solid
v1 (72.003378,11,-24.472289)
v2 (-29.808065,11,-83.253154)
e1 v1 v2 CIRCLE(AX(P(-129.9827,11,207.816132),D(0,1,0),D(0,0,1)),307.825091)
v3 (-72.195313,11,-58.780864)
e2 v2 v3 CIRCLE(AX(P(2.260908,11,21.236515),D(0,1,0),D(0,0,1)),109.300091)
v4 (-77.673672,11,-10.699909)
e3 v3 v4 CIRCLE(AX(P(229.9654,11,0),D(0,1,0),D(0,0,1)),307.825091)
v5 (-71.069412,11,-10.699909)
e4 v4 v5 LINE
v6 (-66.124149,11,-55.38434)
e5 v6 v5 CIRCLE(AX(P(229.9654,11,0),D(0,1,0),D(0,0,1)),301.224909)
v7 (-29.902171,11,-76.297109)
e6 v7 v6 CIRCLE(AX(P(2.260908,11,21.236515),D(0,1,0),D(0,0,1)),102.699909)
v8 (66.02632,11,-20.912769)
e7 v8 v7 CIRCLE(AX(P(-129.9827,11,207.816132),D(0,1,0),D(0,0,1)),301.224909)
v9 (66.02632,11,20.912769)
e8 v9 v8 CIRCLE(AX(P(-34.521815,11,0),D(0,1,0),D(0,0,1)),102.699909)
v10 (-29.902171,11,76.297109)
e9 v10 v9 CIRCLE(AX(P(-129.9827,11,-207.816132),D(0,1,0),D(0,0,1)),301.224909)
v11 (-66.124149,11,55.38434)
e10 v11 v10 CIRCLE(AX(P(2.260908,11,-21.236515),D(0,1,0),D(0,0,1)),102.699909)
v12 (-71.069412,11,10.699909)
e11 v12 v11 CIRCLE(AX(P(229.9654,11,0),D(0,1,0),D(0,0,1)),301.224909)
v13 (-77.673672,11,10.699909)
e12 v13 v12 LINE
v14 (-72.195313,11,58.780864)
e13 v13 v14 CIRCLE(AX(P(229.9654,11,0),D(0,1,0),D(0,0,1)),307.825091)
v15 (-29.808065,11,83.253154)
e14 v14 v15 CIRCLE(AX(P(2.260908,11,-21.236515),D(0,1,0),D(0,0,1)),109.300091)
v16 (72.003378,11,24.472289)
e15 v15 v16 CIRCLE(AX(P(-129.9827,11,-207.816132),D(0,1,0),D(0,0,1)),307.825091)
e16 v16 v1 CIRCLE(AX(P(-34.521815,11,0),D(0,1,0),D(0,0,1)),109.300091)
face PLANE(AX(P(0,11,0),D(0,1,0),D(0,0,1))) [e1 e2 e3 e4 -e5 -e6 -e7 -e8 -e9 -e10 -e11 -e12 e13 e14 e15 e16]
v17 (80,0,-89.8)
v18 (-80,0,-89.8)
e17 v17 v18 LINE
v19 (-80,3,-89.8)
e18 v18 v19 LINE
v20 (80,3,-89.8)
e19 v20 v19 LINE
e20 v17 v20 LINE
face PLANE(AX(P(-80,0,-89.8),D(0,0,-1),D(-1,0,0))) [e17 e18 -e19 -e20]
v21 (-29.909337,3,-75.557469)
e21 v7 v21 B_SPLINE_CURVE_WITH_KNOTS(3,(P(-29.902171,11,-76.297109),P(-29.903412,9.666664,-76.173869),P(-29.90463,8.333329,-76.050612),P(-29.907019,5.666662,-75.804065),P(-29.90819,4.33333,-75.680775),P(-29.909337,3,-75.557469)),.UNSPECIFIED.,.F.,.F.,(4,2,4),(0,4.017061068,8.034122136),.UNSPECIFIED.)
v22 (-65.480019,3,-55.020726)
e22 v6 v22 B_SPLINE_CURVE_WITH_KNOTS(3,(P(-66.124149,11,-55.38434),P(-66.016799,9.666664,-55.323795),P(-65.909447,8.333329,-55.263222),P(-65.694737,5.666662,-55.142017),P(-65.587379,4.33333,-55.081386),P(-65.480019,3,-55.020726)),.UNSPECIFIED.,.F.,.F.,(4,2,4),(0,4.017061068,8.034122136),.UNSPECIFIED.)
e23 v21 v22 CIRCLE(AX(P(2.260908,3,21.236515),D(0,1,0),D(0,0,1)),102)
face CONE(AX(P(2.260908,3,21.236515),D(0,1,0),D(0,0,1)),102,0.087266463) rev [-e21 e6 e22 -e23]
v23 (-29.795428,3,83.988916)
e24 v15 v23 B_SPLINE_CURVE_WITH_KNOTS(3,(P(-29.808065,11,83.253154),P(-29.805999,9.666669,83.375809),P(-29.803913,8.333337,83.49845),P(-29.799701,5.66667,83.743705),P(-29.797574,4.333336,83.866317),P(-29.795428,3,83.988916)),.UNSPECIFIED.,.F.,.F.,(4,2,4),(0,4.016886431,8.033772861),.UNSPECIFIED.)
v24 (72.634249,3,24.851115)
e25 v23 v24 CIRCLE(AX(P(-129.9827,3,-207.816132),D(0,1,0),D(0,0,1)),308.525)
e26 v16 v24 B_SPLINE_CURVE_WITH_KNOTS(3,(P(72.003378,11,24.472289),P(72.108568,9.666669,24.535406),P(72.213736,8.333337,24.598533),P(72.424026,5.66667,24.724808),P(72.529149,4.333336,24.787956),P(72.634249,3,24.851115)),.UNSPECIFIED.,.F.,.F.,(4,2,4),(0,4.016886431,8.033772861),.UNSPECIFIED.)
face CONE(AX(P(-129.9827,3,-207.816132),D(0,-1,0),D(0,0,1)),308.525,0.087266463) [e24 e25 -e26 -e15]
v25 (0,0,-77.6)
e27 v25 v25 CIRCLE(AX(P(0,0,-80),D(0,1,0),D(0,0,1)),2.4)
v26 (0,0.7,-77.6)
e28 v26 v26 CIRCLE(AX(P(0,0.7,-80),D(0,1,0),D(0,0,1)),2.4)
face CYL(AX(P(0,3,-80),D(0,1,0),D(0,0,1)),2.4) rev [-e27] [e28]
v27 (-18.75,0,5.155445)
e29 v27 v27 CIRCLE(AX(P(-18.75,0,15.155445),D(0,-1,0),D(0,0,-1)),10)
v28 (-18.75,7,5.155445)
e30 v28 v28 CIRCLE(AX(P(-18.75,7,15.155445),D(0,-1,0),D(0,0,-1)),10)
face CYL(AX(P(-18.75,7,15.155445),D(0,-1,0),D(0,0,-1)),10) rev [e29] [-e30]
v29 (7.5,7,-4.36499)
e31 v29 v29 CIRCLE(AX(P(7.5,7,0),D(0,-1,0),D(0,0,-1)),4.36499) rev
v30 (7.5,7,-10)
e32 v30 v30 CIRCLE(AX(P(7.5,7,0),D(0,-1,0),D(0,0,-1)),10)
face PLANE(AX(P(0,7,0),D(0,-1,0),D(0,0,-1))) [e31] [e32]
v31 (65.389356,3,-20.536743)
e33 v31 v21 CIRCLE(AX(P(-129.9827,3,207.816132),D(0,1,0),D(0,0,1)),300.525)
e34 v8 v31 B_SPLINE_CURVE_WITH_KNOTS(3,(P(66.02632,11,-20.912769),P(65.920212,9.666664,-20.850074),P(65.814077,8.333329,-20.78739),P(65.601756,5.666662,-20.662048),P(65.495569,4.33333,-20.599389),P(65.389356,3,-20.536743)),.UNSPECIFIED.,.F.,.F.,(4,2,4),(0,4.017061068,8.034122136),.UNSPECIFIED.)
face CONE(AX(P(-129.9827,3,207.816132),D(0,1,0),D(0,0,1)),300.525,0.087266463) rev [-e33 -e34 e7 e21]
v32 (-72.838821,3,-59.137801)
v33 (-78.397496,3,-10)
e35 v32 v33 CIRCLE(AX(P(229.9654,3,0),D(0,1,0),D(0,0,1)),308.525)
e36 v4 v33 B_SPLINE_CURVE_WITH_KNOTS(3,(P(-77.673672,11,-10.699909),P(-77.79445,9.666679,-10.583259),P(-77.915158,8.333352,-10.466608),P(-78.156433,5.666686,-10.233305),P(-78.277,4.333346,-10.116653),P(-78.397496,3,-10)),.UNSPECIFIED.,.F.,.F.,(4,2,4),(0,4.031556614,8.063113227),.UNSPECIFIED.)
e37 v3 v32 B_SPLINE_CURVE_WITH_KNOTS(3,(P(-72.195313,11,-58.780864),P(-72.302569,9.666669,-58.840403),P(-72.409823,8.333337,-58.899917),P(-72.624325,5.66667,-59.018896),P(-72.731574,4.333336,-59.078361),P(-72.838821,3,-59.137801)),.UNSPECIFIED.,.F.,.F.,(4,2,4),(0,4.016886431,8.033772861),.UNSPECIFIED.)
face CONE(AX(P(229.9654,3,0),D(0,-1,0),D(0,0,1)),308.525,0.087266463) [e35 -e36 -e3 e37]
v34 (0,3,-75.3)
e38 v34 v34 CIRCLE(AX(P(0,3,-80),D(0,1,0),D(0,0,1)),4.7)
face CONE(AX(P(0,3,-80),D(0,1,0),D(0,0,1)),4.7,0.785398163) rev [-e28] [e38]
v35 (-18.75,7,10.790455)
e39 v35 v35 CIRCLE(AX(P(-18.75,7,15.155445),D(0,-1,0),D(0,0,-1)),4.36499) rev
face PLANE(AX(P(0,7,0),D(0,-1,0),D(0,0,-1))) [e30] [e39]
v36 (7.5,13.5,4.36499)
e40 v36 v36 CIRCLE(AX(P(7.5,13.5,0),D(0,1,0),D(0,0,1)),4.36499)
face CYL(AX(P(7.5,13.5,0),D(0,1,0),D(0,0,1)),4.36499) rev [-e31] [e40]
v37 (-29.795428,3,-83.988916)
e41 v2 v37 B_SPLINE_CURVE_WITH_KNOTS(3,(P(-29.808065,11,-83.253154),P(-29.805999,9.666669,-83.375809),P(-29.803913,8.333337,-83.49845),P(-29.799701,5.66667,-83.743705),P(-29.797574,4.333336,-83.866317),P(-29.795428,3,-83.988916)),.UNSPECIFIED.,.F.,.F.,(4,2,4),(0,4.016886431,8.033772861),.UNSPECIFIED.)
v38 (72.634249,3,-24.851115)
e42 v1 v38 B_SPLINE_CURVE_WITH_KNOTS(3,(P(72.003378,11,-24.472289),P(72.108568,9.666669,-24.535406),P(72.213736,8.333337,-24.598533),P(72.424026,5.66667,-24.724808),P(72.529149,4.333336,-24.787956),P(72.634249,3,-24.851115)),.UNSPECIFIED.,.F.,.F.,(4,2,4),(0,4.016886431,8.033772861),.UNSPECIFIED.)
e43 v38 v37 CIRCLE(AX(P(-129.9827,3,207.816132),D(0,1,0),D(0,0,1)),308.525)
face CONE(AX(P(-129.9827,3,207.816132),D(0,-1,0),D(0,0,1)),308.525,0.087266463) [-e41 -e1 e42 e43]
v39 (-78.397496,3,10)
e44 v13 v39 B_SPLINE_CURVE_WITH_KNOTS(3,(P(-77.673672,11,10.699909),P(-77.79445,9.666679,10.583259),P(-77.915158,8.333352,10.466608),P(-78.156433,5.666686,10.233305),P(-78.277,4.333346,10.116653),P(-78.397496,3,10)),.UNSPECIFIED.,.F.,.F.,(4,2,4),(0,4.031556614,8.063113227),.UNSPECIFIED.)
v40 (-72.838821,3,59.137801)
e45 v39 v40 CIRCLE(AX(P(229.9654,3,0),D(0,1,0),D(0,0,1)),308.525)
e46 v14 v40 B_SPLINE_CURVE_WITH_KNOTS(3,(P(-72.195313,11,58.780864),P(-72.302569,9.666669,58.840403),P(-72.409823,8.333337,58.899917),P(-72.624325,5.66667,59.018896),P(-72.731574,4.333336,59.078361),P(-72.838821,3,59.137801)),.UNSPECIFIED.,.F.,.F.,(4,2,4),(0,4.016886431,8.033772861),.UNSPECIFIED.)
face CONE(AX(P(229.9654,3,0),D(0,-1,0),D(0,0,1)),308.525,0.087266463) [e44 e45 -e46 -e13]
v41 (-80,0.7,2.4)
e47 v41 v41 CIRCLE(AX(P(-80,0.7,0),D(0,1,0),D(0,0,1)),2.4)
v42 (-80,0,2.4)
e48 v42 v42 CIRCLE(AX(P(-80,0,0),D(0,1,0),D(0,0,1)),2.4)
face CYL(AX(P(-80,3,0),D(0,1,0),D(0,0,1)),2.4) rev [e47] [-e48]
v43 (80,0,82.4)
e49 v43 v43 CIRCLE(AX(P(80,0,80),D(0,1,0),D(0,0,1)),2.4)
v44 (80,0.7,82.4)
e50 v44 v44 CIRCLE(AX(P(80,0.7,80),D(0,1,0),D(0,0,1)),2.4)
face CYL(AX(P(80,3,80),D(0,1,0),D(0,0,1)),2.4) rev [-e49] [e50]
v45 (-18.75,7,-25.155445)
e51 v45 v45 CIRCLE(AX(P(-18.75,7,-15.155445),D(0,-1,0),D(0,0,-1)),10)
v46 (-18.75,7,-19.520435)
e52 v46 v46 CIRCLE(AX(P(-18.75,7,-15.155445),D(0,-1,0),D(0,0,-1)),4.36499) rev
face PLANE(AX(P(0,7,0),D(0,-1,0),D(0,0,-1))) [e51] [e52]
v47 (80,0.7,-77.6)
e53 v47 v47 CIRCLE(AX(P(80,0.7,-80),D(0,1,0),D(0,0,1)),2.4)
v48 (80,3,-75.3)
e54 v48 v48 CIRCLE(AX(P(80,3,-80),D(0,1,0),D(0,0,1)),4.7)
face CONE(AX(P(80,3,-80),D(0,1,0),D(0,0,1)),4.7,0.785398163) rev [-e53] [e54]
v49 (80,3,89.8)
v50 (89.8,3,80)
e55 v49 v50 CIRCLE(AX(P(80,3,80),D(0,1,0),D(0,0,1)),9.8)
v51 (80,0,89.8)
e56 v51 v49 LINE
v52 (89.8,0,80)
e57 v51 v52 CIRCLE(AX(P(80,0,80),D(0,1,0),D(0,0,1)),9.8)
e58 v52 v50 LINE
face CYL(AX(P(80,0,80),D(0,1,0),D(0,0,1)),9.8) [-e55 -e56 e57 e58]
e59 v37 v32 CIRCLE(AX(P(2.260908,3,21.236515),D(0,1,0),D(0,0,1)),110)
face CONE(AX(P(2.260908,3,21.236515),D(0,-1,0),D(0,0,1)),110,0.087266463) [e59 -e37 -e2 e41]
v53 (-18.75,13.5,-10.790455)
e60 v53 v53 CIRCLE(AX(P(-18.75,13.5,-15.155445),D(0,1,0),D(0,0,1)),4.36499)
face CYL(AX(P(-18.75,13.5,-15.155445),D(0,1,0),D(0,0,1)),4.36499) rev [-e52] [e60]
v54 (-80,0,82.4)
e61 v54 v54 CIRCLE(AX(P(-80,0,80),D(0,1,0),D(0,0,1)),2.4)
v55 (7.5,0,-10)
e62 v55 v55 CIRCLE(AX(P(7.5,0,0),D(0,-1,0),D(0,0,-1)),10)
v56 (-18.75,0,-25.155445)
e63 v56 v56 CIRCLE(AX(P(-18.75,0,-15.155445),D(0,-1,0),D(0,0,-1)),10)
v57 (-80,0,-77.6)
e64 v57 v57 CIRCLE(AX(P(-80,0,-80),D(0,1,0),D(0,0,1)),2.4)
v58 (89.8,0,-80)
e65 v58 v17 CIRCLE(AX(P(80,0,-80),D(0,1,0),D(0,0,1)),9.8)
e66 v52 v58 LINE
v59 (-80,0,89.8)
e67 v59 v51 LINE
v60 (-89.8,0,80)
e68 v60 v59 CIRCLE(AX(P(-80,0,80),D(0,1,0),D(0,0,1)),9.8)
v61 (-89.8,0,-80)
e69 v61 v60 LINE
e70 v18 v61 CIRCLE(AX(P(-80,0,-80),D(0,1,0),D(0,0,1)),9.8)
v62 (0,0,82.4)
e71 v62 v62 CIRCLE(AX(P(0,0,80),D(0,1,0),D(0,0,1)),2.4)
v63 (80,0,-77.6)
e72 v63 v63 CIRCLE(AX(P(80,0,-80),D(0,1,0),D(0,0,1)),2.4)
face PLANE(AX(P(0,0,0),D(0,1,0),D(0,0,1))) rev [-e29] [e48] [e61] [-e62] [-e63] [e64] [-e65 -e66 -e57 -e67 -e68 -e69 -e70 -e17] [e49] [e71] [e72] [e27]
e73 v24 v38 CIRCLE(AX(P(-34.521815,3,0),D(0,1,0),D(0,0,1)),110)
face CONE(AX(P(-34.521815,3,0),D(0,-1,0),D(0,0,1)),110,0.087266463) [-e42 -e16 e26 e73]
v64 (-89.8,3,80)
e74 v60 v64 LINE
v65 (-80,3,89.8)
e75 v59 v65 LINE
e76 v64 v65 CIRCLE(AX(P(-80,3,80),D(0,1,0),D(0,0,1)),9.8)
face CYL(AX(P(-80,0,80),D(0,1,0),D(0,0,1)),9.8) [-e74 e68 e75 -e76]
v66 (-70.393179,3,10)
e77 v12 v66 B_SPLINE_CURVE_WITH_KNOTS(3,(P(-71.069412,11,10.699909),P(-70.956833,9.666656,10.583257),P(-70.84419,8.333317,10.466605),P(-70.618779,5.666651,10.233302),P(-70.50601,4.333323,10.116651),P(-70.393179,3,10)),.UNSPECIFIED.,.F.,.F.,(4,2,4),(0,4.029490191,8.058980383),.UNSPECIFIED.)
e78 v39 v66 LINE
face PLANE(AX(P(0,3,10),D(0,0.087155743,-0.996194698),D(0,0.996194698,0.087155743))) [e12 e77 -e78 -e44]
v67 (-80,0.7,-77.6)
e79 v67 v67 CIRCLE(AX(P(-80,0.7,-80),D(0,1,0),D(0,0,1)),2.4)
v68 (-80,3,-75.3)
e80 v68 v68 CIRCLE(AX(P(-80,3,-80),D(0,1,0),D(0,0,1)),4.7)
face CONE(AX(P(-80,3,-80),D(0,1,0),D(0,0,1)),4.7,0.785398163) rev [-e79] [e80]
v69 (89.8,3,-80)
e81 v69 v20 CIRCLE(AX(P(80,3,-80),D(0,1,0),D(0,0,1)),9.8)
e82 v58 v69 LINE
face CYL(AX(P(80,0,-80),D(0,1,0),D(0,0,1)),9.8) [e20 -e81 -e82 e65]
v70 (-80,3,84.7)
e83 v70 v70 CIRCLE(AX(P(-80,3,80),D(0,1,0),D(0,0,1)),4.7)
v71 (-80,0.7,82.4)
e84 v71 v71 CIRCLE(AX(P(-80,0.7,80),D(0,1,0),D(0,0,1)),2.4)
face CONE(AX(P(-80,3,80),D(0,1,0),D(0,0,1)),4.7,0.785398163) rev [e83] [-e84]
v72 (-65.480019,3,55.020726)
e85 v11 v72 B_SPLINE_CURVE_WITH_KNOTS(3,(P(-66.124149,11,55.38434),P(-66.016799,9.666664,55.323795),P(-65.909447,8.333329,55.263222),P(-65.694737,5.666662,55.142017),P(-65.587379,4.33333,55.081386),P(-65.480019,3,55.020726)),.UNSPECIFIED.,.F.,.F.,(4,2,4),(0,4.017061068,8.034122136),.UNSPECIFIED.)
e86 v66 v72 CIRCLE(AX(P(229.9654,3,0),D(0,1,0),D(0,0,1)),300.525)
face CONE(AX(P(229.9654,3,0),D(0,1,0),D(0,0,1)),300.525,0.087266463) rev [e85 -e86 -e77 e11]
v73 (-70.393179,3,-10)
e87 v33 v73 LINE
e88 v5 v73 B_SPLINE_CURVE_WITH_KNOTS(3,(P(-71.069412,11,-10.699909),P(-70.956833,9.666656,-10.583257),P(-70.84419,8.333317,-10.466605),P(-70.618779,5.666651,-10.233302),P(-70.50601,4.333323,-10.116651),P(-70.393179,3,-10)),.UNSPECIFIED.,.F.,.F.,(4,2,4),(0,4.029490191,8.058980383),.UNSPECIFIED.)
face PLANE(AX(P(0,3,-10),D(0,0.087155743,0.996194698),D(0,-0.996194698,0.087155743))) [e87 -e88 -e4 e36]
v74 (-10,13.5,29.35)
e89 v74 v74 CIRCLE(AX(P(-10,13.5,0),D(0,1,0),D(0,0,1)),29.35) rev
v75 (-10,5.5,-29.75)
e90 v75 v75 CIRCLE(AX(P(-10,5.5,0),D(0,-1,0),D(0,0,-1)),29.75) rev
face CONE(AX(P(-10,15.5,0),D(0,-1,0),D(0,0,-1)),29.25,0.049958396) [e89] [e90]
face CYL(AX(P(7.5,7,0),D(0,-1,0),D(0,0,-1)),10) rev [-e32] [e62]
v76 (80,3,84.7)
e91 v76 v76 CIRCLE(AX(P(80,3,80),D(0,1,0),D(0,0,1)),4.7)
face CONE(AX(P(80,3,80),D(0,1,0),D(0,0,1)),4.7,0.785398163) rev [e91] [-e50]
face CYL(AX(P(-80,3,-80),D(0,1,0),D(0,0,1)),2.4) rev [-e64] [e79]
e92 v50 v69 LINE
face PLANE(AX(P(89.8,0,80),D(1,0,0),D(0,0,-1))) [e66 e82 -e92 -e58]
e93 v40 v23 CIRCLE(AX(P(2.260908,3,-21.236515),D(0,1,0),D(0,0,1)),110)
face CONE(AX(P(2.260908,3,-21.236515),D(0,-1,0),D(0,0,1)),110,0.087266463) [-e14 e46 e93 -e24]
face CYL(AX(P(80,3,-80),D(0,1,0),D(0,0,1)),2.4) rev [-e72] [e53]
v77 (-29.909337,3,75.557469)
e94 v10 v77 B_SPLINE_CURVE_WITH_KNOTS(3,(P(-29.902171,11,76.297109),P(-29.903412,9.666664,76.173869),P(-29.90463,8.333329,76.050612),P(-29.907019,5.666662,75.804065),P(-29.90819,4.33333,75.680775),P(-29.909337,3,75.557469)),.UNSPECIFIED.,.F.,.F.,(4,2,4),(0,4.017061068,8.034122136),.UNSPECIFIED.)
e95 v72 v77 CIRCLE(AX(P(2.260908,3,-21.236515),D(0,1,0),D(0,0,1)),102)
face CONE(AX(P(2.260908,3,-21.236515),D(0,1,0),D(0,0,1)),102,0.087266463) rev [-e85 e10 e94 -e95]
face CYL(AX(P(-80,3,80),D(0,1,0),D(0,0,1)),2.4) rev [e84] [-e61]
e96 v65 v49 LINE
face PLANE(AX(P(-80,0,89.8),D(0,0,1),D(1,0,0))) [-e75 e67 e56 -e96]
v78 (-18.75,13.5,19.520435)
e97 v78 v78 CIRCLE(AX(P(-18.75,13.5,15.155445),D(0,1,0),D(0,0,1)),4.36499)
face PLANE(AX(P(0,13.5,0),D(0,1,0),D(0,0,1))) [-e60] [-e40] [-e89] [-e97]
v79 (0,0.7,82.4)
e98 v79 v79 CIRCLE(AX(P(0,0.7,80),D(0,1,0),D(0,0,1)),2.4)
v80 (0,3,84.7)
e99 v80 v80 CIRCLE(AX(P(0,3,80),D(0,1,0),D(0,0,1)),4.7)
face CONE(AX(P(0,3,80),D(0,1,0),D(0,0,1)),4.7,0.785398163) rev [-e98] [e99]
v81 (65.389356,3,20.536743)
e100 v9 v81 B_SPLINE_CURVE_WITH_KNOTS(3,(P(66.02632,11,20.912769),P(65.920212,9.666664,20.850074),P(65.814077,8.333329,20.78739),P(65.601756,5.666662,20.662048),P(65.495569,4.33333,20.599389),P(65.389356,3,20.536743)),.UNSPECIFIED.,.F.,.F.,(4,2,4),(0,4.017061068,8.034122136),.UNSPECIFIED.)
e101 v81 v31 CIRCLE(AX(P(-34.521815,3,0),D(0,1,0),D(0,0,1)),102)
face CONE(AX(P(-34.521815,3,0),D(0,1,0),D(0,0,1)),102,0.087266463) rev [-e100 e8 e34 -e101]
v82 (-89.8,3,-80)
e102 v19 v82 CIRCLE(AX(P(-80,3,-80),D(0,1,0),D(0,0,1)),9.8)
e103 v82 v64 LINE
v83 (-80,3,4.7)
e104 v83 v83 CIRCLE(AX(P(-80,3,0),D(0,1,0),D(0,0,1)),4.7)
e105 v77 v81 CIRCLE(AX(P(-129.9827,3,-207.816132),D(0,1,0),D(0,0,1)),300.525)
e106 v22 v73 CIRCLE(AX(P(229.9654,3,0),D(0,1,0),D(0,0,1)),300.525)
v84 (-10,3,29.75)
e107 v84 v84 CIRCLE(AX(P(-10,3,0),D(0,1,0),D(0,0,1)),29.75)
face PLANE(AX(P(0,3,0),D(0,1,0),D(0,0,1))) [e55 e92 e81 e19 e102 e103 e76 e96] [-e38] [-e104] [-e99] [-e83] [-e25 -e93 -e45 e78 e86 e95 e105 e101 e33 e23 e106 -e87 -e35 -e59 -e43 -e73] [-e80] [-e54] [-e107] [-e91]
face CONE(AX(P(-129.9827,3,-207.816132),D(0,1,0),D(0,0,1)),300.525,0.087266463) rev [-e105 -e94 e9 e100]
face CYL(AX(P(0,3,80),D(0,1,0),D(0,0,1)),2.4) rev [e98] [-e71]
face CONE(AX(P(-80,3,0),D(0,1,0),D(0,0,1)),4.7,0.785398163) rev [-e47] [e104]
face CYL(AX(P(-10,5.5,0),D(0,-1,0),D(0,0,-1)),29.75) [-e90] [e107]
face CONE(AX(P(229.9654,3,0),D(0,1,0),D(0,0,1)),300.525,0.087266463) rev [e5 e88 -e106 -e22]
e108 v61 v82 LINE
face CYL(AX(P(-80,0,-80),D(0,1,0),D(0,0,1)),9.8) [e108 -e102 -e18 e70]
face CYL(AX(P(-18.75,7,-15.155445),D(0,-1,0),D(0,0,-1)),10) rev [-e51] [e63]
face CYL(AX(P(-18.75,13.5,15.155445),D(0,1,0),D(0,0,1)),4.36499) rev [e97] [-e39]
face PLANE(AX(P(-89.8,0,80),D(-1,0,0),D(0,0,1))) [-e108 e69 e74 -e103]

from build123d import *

# Parameters (mm, degrees)
SKETCH1_W                = 180
SKETCH1_H                = 180
SKETCH1_W_2              = 160
SKETCH1_H_2              = 160
SKETCH1_W_3              = 140
SKETCH1_H_3              = 140
BOSS_EXTRUDE1_DEPTH      = 3
SKETCH1_3_W              = 140
SKETCH1_3_H              = 140
BOSS_EXTRUDE2_DEPTH      = 5
SKETCH6_R                = 4.7
BOSS_EXTRUDE4_DEPTH      = 8
BOSS_EXTRUDE5_DEPTH      = 8
BOSS_EXTRUDE5_DRAFT      = 5
CUT_EXTRUDE1_START       = -5
SKETCH12_R               = 4.7
CUT_EXTRUDE1_DEPTH       = 5
SKETCH13_R               = 29.75
BOSS_EXTRUDE6_DEPTH      = 2.5
SKETCH14_R               = 29.75
SKETCH16_R               = 29.25
CUT_EXTRUDE2_START       = -2
CUT_EXTRUDE2_OUTLINE_R   = 34.25
CUT_EXTRUDE2_DEPTH       = 2
FILLET1_R                = 10
SKETCH19_W               = 140
SKETCH19_H               = 140
CUT_EXTRUDE3_DEPTH       = 5
F_5_16_CLEARANCE_HOLE1_D = 8.72998
SKETCH24_R               = 10
SKETCH24_R_2             = 4.36499
CUT_EXTRUDE4_DEPTH       = 7
CUT_EXTRUDE5_DEPTH       = 128.711589146


# Read off the part's stored shape, not the designer's step: CSK for M4 Flat Head Machine Screw1, Cut-Extrude2
with BuildPart() as part:
    # Sketch1 → Boss-Extrude1 (new body)
    # profile 1 of 3: a face of its own
    with BuildSketch(Plane(origin=(0, 0, 0), x_dir=(1, 0, 0), z_dir=(0, 1, 0))):
        Rectangle(SKETCH1_W, SKETCH1_H)
        Rectangle(SKETCH1_W_2, SKETCH1_H_2, mode=Mode.SUBTRACT)
    # profile 2 of 3: a face of its own
    with BuildSketch(Plane(origin=(0, 0, 0), x_dir=(1, 0, 0), z_dir=(0, 1, 0))):
        Rectangle(SKETCH1_W_2, SKETCH1_H_2)
        Rectangle(SKETCH1_W_3, SKETCH1_H_3, mode=Mode.SUBTRACT)
    # profile 3 of 3: a face of its own
    with BuildSketch(Plane(origin=(0, 0, 0), x_dir=(1, 0, 0), z_dir=(0, 1, 0))):
        Rectangle(SKETCH1_W_3, SKETCH1_H_3)
    extrude(amount=BOSS_EXTRUDE1_DEPTH)

    # Sketch1<3> → Boss-Extrude2 (add)
    with BuildSketch(Plane(origin=(0, 0, 0), x_dir=(1, 0, 0), z_dir=(0, 1, 0))):
        Rectangle(SKETCH1_3_W, SKETCH1_3_H)
    extrude(amount=-BOSS_EXTRUDE2_DEPTH)

    # CSK for M4 Flat Head Machine Screw1 outl → CSK for M4 Flat Head Machine Screw1 (revolve, cut)
    with BuildSketch(Plane(origin=(-80, 0, 0), x_dir=(1, 0, 0), z_dir=(0, 0, 1))):
        Polygon((0, 0), (2.4, 0), (2.4, 0.7), (4.7, 3), (0, 3), align=None)
    revolve(axis=Axis((-80, 0, 0), (0, 1, 0)), mode=Mode.SUBTRACT)

    # CSK for M4 Flat Head Machine Screw1 2 ou → CSK for M4 Flat Head Machine Screw1 2 (revolve, cut)
    with BuildSketch(Plane.XY.offset(80)):
        Polygon((0, 0), (2.4, 0), (2.4, 0.7), (4.7, 3), (0, 3), align=None)
    revolve(axis=Axis((0, 0, 80), (0, 1, 0)), mode=Mode.SUBTRACT)

    # CSK for M4 Flat Head Machine Screw1 3 ou → CSK for M4 Flat Head Machine Screw1 3 (revolve, cut)
    with BuildSketch(Plane(origin=(80, 0, 0), x_dir=(1, 0, 0), z_dir=(0, 0, 1))):
        Polygon((0, 0), (2.4, 0), (2.4, 0.7), (4.7, 3), (0, 3), align=None)
    revolve(axis=Axis((80, 0, 0), (0, 1, 0)), mode=Mode.SUBTRACT)

    # CSK for M4 Flat Head Machine Screw1 4 ou → CSK for M4 Flat Head Machine Screw1 4 (revolve, cut)
    with BuildSketch(Plane.XY.offset(-80)):
        Polygon((0, 0), (2.4, 0), (2.4, 0.7), (4.7, 3), (0, 3), align=None)
    revolve(axis=Axis((0, 0, -80), (0, 1, 0)), mode=Mode.SUBTRACT)

    # CSK for M4 Flat Head Machine Screw1 5 ou → CSK for M4 Flat Head Machine Screw1 5 (revolve, cut)
    with BuildSketch(Plane(origin=(-80, 0, 80), x_dir=(1, 0, 0), z_dir=(0, 0, 1))):
        Polygon((0, 0), (2.4, 0), (2.4, 0.7), (4.7, 3), (0, 3), align=None)
    revolve(axis=Axis((-80, 0, 80), (0, 1, 0)), mode=Mode.SUBTRACT)

    # CSK for M4 Flat Head Machine Screw1 6 ou → CSK for M4 Flat Head Machine Screw1 6 (revolve, cut)
    with BuildSketch(Plane(origin=(80, 0, -80), x_dir=(1, 0, 0), z_dir=(0, 0, 1))):
        Polygon((0, 0), (2.4, 0), (2.4, 0.7), (4.7, 3), (0, 3), align=None)
    revolve(axis=Axis((80, 0, -80), (0, 1, 0)), mode=Mode.SUBTRACT)

    # CSK for M4 Flat Head Machine Screw1 7 ou → CSK for M4 Flat Head Machine Screw1 7 (revolve, cut)
    with BuildSketch(Plane(origin=(80, 0, 80), x_dir=(1, 0, 0), z_dir=(0, 0, 1))):
        Polygon((0, 0), (2.4, 0), (2.4, 0.7), (4.7, 3), (0, 3), align=None)
    revolve(axis=Axis((80, 0, 80), (0, 1, 0)), mode=Mode.SUBTRACT)

    # CSK for M4 Flat Head Machine Screw1 8 ou → CSK for M4 Flat Head Machine Screw1 8 (revolve, cut)
    with BuildSketch(Plane(origin=(-80, 0, -80), x_dir=(1, 0, 0), z_dir=(0, 0, 1))):
        Polygon((0, 0), (2.4, 0), (2.4, 0.7), (4.7, 3), (0, 3), align=None)
    revolve(axis=Axis((-80, 0, -80), (0, 1, 0)), mode=Mode.SUBTRACT)

    # CSK for M4 Flat Head Machine Screw1 9 ou → CSK for M4 Flat Head Machine Screw1 9 (revolve, cut)
    with BuildSketch(Plane.XY):
        Polygon((0, -5), (2.4, -5), (2.4, 0.7), (4.7, 3), (0, 3), align=None)
    revolve(axis=Axis((0, 0, 0), (0, 1, 0)), mode=Mode.SUBTRACT)

    # Sketch6 → Boss-Extrude4 (add, through all)
    with BuildSketch(Plane(origin=(0, 3, 0), x_dir=(1, 0, 0), z_dir=(0, 1, 0))):
        with Locations(Location((80, 0, 0), (0, 0, 270))):
            Circle(SKETCH6_R)
        Circle(SKETCH6_R)
    extrude(amount=-BOSS_EXTRUDE4_DEPTH)


with BuildPart() as boss_extrude5_tool:
    # Sketch10 → Boss-Extrude5 (with draft: the straight prism first)
    with BuildSketch(Plane(origin=(0, 3, 0), x_dir=(1, 0, 0), z_dir=(0, 1, 0))):
        with BuildLine():
            Line((-70.393178849, -10), (-78.397496431, -10))
            ThreePointArc((-78.397496431, -10), (-76.604236916, -34.68045004), (-72.838821124, -59.137801445))
            ThreePointArc((-72.838821124, -59.137801445), (-52.739092363, -74.026279442), (-29.795427813, -83.98891616))
            ThreePointArc((-29.795427813, -83.98891616), (24.279800219, -59.374355653), (72.634248938, -24.851114715))
            ThreePointArc((72.634248938, -24.851114715), (75.478184725, 0), (72.634248938, 24.851114715))
            ThreePointArc((72.634248938, 24.851114715), (24.279800219, 59.374355653), (-29.795427813, 83.98891616))
            ThreePointArc((-29.795427813, 83.98891616), (-52.739092363, 74.026279442), (-72.838821124, 59.137801445))
            ThreePointArc((-72.838821124, 59.137801445), (-76.604236916, 34.68045004), (-78.397496431, 10))
            Line((-78.397496431, 10), (-70.393178849, 10))
            ThreePointArc((-70.393178849, 10), (-68.785863401, 32.603044383), (-65.480018889, 55.020726474))
            ThreePointArc((-65.480018889, 55.020726474), (-48.739092363, 67.098076211), (-29.909337417, 75.557468997))
            ThreePointArc((-29.909337417, 75.557468997), (20.279800219, 52.446152423), (65.389356306, 20.536742523))
            ThreePointArc((65.389356306, 20.536742523), (67.478184725, 0), (65.389356306, -20.536742523))
            ThreePointArc((65.389356306, -20.536742523), (20.279800219, -52.446152423), (-29.909337417, -75.557468997))
            ThreePointArc((-29.909337417, -75.557468997), (-48.739092363, -67.098076211), (-65.480018889, -55.020726474))
            ThreePointArc((-65.480018889, -55.020726474), (-68.785863401, -32.603044383), (-70.393178849, -10))
        make_face()
    extrude(amount=BOSS_EXTRUDE5_DEPTH)
    # Boss-Extrude5: the draft: its side faces are tilted about the plane it starts from
    boss_extrude5_sides = [boss_extrude5_tool.faces().sort_by_distance(p)[0] for p in [
        (-74.39533764, 7, 10),
        (-76.604236916, 7, 34.68045004),
        (-52.739092363, 7, 74.026279442),
        (24.279800219, 7, 59.374355653),
        (75.478184725, 7, 0),
        (24.279800219, 7, -59.374355653),
        (-52.739092363, 7, -74.026279442),
        (-76.604236916, 7, -34.68045004),
        (-74.39533764, 7, -10),
        (-68.785863401, 7, -32.603044383),
        (-48.739092363, 7, -67.098076211),
        (20.279800219, 7, -52.446152423),
        (67.478184725, 7, 0),
        (20.279800219, 7, 52.446152423),
        (-48.739092363, 7, 67.098076211),
        (-68.785863401, 7, 32.603044383),
    ]]
    draft(boss_extrude5_sides, Plane(origin=(0, 3, 0), x_dir=(1, 0, 0), z_dir=(0, 1, 0)), BOSS_EXTRUDE5_DRAFT)


with BuildPart() as part_1:
    add(part.part)

    # Boss-Extrude5: add boss_extrude5_tool
    add(boss_extrude5_tool.part)

    # Sketch12 → Cut-Extrude1 (cut)
    with BuildSketch(Plane.XZ.offset(5).offset(CUT_EXTRUDE1_START)):
        with Locations((80, 0)):
            Circle(SKETCH12_R)
    extrude(amount=CUT_EXTRUDE1_DEPTH, mode=Mode.SUBTRACT)

    # Sketch13 → Boss-Extrude6 (add)
    with BuildSketch(Plane(origin=(0, 3, 0), x_dir=(1, 0, 0), z_dir=(0, 1, 0))):
        with Locations(Location((-10, 0, 0), (0, 0, 270))):
            Circle(SKETCH13_R)
    extrude(amount=BOSS_EXTRUDE6_DEPTH)

    # Sketch14 → Loft1 section 0
    with BuildSketch(Plane(origin=(0, 5.5, 0), x_dir=(1, 0, 0), z_dir=(0, 1, 0))):
        with Locations((-10, 0)):
            Circle(SKETCH14_R)
    # Sketch16 → Loft1 section 1
    with BuildSketch(Plane(origin=(0, 15.5, 0), x_dir=(1, 0, 0), z_dir=(0, 1, 0))):
        with Locations((-10, 0)):
            Circle(SKETCH16_R)
    loft()

    # Cut-Extrude2 outline → Cut-Extrude2 (cut)
    with BuildSketch(Plane(origin=(0, 15.5, 0), x_dir=(1, 0, 0), z_dir=(0, 1, 0)).offset(CUT_EXTRUDE2_START)):
        with Locations((-10, 0)):
            Circle(CUT_EXTRUDE2_OUTLINE_R)
    extrude(amount=CUT_EXTRUDE2_DEPTH, mode=Mode.SUBTRACT)

    # Fillet1
    fillet1_edges = [part_1.edges().sort_by_distance(p)[0] for p in [
        (-90, 1.5, 90),
        (-90, 1.5, -90),
        (90, 1.5, -90),
        (90, 1.5, 90),
    ]]
    fillet(fillet1_edges, radius=FILLET1_R)

    # Sketch19 → Cut-Extrude3 (cut)
    with BuildSketch(Plane.XZ.offset(5)):
        Rectangle(SKETCH19_W, SKETCH19_H)
    extrude(amount=-CUT_EXTRUDE3_DEPTH, mode=Mode.SUBTRACT)

    # 5/16 Clearance Hole1 (through all)
    with Locations(Plane(origin=(0, 13.5, 0), x_dir=(1, 0, 0), z_dir=(0, 1, 0))):
        with Locations((-18.75, 15.155444566), (7.5, 0), (-18.75, -15.155444566)):
            Hole(F_5_16_CLEARANCE_HOLE1_D / 2)

    # Sketch24 → Cut-Extrude4 (cut)
    # profile 1 of 6: a face of its own
    with BuildSketch(Plane.XZ):
        with Locations(Location((-18.75, 15.155444566, 0), (0, 0, 270))):
            Circle(SKETCH24_R)
        with Locations(Location((-18.75, 15.155444566, 0), (0, 0, 90))):
            Circle(SKETCH24_R_2, mode=Mode.SUBTRACT)
    # profile 2 of 6: a face of its own
    with BuildSketch(Plane.XZ):
        with Locations(Location((7.5, 0, 0), (0, 0, 270))):
            Circle(SKETCH24_R)
        with Locations(Location((7.5, 0, 0), (0, 0, 90))):
            Circle(SKETCH24_R_2, mode=Mode.SUBTRACT)
    # profile 3 of 6: a face of its own
    with BuildSketch(Plane.XZ):
        with Locations(Location((-18.75, -15.155444566, 0), (0, 0, 270))):
            Circle(SKETCH24_R)
        with Locations(Location((-18.75, -15.155444566, 0), (0, 0, 90))):
            Circle(SKETCH24_R_2, mode=Mode.SUBTRACT)
    # profile 4 of 6: a face of its own
    with BuildSketch(Plane.XZ):
        with Locations(Location((-18.75, -15.155444566, 0), (0, 0, 90))):
            Circle(SKETCH24_R_2)
    # profile 5 of 6: a face of its own
    with BuildSketch(Plane.XZ):
        with Locations(Location((-18.75, 15.155444566, 0), (0, 0, 90))):
            Circle(SKETCH24_R_2)
    # profile 6 of 6: a face of its own
    with BuildSketch(Plane.XZ):
        with Locations(Location((7.5, 0, 0), (0, 0, 90))):
            Circle(SKETCH24_R_2)
    extrude(amount=-CUT_EXTRUDE4_DEPTH, mode=Mode.SUBTRACT)

    # Sketch25 → Cut-Extrude5 (cut, through all)
    with BuildSketch(Plane(origin=(0, 3, 0), x_dir=(1, 0, 0), z_dir=(0, 1, 0))):
        with BuildLine():
            Line((90, -80), (90, 80))
            ThreePointArc((90, 80), (87.071067812, 87.071067812), (80, 90))
            Line((80, 90), (-80, 90))
            ThreePointArc((-80, 90), (-87.071067812, 87.071067812), (-90, 80))
            Line((-90, 80), (-90, -80))
            ThreePointArc((-90, -80), (-87.071067812, -87.071067812), (-80, -90))
            Line((-80, -90), (80, -90))
            ThreePointArc((80, -90), (87.071067812, -87.071067812), (90, -80))
        make_face()
        with BuildLine():
            Line((-80, 89.8), (80, 89.8))
            ThreePointArc((80, 89.8), (86.929646456, 86.929646456), (89.8, 80))
            Line((89.8, 80), (89.8, -80))
            ThreePointArc((89.8, -80), (86.929646456, -86.929646456), (80, -89.8))
            Line((80, -89.8), (-80, -89.8))
            ThreePointArc((-80, -89.8), (-86.929646456, -86.929646456), (-89.8, -80))
            Line((-89.8, -80), (-89.8, 80))
            ThreePointArc((-89.8, 80), (-86.929646456, 86.929646456), (-80, 89.8))
        make_face(mode=Mode.SUBTRACT)
    extrude(amount=-CUT_EXTRUDE5_DEPTH, mode=Mode.SUBTRACT)


solid = part_1.part
